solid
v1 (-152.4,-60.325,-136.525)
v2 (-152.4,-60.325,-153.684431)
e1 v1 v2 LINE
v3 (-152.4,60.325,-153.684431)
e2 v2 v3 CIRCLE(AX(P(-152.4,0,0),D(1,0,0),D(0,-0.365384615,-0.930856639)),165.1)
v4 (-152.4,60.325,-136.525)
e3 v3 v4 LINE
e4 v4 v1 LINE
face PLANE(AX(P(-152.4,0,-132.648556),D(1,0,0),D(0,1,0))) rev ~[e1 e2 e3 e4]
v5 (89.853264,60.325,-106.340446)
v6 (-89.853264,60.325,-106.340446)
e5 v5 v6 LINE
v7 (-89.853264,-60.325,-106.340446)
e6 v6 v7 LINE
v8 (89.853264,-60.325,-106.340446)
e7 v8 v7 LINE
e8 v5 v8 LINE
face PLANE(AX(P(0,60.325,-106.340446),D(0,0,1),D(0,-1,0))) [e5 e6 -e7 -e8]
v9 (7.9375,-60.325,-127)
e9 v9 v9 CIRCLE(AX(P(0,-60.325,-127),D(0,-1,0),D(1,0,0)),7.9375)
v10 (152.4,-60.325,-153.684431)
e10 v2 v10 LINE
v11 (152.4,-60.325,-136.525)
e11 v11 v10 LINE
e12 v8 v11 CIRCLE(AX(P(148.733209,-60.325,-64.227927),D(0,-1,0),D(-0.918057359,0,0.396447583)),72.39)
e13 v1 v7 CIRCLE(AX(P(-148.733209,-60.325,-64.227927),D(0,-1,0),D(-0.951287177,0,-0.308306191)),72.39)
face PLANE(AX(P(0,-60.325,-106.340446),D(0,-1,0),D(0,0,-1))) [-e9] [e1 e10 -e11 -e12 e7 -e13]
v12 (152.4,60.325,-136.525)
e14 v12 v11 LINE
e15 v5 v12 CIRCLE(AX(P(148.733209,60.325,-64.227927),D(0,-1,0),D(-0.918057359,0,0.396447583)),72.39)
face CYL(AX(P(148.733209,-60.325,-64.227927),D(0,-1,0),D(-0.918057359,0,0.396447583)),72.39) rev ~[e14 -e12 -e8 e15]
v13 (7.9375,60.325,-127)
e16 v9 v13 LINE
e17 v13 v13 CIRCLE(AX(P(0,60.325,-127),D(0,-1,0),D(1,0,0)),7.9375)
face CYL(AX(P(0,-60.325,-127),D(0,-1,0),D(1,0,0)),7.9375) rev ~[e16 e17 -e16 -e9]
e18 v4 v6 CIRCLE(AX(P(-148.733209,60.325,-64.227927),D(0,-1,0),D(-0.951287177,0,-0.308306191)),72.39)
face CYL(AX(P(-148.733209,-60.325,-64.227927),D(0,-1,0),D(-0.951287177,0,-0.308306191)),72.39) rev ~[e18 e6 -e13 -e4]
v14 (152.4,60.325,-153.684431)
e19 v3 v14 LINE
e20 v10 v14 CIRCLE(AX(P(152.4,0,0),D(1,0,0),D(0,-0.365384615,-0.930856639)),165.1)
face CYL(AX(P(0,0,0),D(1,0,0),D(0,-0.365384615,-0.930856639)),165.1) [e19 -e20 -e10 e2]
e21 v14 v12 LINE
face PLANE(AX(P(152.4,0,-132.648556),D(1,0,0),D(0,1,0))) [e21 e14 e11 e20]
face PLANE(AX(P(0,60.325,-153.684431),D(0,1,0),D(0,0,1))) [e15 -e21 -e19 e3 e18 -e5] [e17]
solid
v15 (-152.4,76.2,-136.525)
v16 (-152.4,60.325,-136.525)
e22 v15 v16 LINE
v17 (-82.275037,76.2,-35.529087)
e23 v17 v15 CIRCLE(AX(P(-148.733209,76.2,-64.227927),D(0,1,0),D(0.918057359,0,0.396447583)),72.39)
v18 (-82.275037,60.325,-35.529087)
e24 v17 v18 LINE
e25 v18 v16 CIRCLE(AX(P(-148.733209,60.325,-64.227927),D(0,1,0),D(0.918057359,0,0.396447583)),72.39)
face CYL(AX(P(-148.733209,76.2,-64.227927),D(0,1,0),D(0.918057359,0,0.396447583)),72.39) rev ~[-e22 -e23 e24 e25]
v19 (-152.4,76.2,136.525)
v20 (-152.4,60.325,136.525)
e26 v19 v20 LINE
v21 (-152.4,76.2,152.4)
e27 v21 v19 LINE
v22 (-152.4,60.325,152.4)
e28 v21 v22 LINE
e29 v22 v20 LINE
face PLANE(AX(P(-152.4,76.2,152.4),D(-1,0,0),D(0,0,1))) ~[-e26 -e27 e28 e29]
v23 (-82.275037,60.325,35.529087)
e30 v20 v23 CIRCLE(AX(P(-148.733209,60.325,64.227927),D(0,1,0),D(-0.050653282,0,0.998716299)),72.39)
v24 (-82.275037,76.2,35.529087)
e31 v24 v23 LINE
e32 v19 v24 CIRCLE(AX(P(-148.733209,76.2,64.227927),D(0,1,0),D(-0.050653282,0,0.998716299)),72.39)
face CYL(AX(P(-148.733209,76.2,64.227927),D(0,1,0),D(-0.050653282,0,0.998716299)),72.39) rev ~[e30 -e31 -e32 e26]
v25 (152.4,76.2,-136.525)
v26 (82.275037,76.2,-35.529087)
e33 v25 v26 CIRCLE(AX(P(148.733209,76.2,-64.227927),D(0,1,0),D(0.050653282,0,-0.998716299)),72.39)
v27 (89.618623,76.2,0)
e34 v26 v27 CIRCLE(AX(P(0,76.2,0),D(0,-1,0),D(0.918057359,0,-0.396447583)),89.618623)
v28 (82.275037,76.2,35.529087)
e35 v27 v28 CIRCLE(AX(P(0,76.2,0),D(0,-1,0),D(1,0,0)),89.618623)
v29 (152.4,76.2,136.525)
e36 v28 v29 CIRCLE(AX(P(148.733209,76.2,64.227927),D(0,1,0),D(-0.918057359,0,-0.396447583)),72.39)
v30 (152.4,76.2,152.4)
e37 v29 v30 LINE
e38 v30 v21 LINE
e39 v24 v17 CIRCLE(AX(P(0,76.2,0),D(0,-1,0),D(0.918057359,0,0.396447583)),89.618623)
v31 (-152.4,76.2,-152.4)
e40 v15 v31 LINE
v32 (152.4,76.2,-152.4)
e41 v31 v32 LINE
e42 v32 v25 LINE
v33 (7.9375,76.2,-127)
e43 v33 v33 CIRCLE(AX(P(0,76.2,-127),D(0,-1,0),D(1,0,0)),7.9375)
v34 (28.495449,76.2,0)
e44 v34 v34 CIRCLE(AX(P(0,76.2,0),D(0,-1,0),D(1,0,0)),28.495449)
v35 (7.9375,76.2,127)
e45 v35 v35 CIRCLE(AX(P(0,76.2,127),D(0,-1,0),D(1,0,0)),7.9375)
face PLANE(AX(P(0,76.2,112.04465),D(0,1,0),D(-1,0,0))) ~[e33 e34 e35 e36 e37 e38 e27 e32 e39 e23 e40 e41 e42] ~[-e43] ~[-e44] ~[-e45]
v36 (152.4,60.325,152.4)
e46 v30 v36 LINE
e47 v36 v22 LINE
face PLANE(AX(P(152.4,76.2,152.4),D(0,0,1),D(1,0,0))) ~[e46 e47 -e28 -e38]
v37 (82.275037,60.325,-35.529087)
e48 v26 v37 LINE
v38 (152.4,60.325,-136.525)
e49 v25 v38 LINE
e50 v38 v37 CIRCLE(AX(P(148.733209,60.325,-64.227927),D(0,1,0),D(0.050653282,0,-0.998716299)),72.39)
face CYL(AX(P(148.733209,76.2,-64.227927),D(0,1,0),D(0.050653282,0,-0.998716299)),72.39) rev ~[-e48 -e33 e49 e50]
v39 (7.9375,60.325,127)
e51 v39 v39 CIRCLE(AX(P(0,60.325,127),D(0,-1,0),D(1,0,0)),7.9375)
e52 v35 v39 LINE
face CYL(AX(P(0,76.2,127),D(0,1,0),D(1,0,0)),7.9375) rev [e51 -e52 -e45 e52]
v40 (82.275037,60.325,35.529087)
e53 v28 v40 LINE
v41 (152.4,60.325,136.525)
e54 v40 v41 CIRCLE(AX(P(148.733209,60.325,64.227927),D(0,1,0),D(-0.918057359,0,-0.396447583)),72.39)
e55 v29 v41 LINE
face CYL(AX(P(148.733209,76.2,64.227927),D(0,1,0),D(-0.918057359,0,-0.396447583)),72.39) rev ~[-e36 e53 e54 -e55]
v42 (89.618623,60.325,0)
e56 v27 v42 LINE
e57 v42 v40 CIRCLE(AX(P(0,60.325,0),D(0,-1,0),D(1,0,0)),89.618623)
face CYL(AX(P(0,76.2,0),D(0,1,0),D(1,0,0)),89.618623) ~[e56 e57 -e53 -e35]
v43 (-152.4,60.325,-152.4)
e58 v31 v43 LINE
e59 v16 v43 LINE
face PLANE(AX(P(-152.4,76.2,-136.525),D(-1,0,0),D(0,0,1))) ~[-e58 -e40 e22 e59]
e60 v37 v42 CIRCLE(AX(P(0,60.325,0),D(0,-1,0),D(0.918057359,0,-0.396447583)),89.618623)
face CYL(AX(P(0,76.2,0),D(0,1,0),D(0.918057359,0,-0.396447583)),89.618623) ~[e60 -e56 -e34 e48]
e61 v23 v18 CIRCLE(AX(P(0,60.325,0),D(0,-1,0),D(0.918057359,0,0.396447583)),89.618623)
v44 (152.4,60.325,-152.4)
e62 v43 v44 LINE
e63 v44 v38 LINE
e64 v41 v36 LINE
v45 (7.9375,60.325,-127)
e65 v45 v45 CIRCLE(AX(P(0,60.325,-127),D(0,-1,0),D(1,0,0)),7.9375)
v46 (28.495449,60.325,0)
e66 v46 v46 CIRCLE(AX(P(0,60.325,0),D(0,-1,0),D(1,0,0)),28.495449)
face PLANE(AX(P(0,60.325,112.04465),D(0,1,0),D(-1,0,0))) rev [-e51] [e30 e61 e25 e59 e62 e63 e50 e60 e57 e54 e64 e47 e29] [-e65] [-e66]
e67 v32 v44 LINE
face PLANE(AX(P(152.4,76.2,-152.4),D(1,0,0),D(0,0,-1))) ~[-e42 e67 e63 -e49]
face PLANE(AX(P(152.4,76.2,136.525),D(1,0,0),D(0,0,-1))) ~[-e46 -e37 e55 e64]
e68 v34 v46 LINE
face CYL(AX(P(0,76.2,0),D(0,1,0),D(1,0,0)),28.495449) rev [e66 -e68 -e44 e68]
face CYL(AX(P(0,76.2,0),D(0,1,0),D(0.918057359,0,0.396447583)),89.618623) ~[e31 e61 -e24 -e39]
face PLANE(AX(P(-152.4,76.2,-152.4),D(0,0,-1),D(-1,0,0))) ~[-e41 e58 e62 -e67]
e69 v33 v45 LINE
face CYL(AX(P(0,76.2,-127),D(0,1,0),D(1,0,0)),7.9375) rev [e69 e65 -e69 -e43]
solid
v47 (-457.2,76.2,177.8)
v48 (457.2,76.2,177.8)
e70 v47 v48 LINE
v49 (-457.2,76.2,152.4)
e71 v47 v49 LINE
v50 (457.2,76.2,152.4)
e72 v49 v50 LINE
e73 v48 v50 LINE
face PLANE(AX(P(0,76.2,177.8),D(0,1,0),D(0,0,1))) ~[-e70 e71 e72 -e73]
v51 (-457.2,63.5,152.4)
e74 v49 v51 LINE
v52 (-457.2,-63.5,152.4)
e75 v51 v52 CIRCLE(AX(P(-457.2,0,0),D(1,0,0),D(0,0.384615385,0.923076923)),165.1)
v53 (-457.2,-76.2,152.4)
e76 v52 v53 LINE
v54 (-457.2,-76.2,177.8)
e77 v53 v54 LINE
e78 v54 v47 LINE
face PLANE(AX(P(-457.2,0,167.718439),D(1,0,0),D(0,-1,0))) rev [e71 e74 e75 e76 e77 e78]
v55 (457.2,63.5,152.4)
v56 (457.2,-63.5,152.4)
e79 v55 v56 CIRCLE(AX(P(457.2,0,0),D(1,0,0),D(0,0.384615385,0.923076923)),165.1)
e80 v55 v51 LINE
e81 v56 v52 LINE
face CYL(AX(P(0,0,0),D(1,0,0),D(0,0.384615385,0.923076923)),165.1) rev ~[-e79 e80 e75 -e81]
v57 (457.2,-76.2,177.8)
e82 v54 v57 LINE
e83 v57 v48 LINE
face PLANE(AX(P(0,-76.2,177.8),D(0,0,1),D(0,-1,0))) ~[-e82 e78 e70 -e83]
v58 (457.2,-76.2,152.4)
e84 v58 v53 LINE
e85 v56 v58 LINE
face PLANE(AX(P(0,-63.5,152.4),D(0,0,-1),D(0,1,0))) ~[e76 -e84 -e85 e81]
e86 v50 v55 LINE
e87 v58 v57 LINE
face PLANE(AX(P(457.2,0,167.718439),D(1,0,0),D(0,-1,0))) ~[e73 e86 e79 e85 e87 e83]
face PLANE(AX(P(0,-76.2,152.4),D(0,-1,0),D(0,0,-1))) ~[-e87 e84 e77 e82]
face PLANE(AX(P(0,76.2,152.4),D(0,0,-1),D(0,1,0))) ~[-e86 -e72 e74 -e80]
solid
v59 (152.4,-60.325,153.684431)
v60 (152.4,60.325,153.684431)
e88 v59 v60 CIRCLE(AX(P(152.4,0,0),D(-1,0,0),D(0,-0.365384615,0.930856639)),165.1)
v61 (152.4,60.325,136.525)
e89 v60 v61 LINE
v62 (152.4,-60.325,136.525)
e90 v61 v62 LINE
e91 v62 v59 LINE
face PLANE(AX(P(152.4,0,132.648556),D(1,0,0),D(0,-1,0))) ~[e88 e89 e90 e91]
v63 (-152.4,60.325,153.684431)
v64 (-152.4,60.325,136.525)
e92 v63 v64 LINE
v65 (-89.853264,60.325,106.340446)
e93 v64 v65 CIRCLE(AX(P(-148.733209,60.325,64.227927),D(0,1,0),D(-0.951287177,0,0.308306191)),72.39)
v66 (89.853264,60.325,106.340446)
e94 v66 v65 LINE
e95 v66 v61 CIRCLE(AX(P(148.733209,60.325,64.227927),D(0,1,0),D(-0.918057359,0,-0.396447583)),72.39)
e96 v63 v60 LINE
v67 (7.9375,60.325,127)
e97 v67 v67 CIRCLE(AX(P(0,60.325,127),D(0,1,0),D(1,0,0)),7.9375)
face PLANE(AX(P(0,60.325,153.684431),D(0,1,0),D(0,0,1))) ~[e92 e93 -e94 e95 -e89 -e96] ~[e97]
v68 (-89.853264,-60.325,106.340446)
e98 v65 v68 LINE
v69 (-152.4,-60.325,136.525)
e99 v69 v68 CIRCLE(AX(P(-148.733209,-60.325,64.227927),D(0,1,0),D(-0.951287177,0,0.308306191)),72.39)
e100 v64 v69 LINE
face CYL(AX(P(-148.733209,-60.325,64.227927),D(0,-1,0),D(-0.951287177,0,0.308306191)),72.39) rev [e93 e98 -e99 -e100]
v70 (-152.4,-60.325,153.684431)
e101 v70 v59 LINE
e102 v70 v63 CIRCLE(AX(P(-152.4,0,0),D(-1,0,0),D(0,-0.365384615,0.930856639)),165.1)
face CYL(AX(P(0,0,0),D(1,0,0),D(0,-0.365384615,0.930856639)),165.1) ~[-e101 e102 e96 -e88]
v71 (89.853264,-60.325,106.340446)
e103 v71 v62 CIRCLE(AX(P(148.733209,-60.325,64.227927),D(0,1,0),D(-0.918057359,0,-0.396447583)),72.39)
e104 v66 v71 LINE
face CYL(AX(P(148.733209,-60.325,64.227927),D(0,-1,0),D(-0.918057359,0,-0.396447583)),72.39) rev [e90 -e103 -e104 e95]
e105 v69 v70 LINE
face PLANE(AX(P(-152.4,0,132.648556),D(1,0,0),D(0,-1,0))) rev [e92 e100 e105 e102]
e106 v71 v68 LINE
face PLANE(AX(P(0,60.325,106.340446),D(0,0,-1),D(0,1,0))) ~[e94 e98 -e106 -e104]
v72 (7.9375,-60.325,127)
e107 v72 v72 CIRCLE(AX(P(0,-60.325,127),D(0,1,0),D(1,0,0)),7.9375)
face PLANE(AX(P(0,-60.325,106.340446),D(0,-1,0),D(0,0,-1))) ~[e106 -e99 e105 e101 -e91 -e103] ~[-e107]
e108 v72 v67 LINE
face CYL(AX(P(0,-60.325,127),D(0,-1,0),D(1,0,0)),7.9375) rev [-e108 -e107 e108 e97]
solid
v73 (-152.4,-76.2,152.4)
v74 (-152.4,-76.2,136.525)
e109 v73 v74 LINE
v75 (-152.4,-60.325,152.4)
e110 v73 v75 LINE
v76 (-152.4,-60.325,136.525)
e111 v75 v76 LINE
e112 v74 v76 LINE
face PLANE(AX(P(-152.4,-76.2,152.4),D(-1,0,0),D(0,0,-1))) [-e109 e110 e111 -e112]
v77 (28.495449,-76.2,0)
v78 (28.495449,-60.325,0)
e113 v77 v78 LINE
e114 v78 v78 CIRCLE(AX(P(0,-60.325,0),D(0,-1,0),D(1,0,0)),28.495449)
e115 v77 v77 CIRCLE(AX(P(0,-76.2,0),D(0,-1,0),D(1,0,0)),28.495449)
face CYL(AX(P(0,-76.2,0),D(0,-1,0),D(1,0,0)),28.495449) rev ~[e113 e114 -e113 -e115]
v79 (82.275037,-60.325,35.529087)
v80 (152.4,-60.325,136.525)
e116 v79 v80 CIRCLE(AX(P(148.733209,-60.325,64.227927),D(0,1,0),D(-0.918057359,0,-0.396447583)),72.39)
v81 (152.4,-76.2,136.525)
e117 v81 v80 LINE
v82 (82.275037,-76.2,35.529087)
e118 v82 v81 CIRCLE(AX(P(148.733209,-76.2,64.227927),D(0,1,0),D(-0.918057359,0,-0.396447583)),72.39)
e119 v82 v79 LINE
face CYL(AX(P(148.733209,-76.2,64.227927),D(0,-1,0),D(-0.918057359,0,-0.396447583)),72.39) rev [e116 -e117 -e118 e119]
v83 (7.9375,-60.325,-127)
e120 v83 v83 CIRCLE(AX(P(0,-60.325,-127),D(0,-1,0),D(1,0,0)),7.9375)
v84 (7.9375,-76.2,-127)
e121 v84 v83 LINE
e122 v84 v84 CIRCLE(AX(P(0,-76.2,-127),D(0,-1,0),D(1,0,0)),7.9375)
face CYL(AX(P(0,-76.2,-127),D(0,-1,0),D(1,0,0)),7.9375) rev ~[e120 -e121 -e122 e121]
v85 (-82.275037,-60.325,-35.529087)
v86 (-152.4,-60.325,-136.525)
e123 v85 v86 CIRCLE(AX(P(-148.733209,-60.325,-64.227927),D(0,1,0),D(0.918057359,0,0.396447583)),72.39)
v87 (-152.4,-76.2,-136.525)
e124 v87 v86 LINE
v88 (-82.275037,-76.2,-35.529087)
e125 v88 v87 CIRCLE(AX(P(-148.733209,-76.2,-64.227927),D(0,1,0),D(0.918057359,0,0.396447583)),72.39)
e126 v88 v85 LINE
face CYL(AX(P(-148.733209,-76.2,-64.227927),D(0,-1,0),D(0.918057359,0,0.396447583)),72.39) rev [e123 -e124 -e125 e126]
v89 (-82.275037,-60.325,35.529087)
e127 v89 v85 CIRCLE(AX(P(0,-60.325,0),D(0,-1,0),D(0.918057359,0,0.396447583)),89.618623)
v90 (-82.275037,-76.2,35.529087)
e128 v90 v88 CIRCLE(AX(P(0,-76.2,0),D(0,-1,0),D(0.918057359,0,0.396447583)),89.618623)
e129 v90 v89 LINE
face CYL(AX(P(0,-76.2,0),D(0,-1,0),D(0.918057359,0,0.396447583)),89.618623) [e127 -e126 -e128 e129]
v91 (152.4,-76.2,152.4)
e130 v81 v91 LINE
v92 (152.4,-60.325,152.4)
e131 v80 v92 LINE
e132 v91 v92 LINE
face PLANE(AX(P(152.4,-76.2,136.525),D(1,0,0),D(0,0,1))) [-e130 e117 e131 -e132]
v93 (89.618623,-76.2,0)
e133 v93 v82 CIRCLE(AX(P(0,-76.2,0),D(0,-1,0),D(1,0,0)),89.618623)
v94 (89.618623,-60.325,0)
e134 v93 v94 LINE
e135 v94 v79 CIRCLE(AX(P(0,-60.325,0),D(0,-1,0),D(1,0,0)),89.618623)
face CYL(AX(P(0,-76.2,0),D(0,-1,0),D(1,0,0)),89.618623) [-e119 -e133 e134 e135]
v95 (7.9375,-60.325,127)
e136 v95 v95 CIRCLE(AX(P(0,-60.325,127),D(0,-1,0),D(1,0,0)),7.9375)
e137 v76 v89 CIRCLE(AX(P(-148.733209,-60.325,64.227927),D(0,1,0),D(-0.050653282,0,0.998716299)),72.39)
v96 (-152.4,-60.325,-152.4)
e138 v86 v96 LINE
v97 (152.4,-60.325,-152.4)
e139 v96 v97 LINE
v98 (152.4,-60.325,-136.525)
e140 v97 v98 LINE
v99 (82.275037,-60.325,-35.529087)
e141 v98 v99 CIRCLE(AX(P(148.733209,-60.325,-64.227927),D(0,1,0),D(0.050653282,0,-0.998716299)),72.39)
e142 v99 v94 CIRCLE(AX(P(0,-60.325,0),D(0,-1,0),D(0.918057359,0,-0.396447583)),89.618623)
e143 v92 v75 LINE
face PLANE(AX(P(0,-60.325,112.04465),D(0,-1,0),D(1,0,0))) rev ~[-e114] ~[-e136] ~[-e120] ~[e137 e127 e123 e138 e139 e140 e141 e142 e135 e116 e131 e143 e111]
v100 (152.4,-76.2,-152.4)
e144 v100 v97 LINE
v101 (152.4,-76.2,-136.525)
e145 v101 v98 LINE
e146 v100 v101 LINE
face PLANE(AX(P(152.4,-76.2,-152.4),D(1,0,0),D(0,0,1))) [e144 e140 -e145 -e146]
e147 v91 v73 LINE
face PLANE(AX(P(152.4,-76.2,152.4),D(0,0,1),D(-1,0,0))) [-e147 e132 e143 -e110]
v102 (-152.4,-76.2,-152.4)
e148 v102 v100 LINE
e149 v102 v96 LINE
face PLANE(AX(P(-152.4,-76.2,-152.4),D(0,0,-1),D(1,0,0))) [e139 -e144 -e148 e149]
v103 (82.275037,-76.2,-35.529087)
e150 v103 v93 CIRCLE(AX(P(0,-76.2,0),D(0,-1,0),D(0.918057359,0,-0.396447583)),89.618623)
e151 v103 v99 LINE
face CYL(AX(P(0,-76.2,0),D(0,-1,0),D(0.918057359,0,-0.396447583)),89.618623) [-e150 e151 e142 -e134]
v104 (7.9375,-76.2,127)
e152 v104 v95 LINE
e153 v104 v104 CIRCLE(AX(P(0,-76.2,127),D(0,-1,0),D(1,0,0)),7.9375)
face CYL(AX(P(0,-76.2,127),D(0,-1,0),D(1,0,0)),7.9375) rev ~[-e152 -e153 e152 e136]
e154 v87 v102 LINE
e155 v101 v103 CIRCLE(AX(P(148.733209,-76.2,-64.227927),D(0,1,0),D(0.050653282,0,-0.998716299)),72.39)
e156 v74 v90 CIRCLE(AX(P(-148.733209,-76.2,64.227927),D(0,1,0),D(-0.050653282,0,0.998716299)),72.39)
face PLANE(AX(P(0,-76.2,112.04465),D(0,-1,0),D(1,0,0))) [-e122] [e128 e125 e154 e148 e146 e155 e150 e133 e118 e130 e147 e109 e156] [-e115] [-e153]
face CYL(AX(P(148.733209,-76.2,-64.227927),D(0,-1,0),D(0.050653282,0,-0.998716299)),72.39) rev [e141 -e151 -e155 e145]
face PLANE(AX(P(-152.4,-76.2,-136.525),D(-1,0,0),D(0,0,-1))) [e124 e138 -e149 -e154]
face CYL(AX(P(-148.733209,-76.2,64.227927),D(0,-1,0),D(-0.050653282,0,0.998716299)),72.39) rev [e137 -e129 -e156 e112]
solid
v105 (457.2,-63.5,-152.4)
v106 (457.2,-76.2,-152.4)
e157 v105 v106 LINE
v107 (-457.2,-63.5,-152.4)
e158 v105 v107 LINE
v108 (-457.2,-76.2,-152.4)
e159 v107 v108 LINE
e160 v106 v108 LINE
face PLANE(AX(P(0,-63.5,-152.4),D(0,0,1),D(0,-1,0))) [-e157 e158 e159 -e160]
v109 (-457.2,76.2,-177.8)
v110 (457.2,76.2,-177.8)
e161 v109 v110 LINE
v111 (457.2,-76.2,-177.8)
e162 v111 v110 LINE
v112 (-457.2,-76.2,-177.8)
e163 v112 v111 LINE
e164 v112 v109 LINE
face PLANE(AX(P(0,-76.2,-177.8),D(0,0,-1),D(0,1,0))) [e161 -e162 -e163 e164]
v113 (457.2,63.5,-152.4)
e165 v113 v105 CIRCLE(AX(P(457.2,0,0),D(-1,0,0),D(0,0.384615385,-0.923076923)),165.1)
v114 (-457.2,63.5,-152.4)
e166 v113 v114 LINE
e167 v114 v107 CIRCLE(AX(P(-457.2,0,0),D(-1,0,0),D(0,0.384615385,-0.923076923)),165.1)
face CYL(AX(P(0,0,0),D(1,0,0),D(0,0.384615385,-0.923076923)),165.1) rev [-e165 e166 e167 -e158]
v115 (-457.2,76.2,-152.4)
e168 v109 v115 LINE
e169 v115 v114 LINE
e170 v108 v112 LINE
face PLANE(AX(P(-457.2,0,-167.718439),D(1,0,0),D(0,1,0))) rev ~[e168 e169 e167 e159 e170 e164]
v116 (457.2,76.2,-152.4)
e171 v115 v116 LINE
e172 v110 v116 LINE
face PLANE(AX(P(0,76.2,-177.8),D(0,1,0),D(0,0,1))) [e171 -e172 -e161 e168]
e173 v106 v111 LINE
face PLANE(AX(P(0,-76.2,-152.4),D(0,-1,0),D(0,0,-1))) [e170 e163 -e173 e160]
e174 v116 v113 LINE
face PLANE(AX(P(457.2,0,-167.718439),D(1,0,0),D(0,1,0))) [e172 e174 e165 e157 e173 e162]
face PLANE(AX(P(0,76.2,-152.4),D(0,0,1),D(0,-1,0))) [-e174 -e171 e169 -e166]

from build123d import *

# Parameters (mm, degrees)
F3_DEPTH  = 457.2
F5_R      = 7.9375
F5_R_2    = 28.4954486751
F6_DEPTH  = 15.875
F8_DEPTH  = 152.4
F9_R      = 7.9375
F10_DEPTH = 136.526


# Not quite as in the source:
# - a variable given as a bare number and used for a length is read in inches; the dataset says mm whatever the document's units were


with BuildPart() as f3:
    # F2 (on Right) → F3 (new body, symmetric)
    with BuildSketch(Plane.YZ):
        with BuildLine():
            Line((-76.2, -152.4), (-76.2, -177.8))
            Line((-76.2, -177.8), (76.2, -177.8))
            Line((76.2, -177.8), (76.2, -152.4))
            Line((76.2, -152.4), (63.5, -152.4))
            ThreePointArc((63.5, -152.4), (0, -165.1), (-63.5, -152.4))
            Line((-63.5, -152.4), (-76.2, -152.4))
        make_face()
    extrude(amount=F3_DEPTH, both=True)


with BuildPart() as f6:
    # F5 (on offset) → F6 (new body)
    with BuildSketch(Plane.XZ.offset(76.2)):
        with BuildLine():
            ThreePointArc((-82.2750366967, 35.5290866249), (0, 89.6186233985), (82.2750366967, 35.5290866249))
            ThreePointArc((82.2750366967, 35.5290866249), (89.271178874, 105.5144756245), (152.4, 136.525))
            Line((152.4, 136.525), (152.4, 152.4))
            Line((152.4, 152.4), (0, 152.4))
            Line((0, 152.4), (-152.4, 152.4))
            Line((-152.4, 152.4), (-152.4, 136.525))
            ThreePointArc((-152.4, 136.525), (-89.271178874, 105.5144756245), (-82.2750366967, 35.5290866249))
        make_face()
        with Locations((0, 127)):
            Circle(F5_R, mode=Mode.SUBTRACT)
        with BuildLine():
            ThreePointArc((82.2750366967, -35.5290866249), (87.7635265605, -18.1400403944), (89.6186233985, 0))
            ThreePointArc((89.6186233985, 0), (87.7635265605, 18.1400403944), (82.2750366967, 35.5290866249))
            ThreePointArc((82.2750366967, 35.5290866249), (0, 89.6186233985), (-82.2750366967, 35.5290866249))
            ThreePointArc((-82.2750366967, 35.5290866249), (-89.6186233985, 0), (-82.2750366967, -35.5290866249))
            ThreePointArc((-82.2750366967, -35.5290866249), (0, -89.6186233985), (82.2750366967, -35.5290866249))
        make_face()
        Circle(F5_R_2, mode=Mode.SUBTRACT)
        with BuildLine():
            ThreePointArc((152.4, -136.525), (89.271178874, -105.5144756245), (82.2750366967, -35.5290866249))
            ThreePointArc((82.2750366967, -35.5290866249), (0, -89.6186233985), (-82.2750366967, -35.5290866249))
            ThreePointArc((-82.2750366967, -35.5290866249), (-89.271178874, -105.5144756245), (-152.4, -136.525))
            Line((-152.4, -136.525), (-152.4, -152.4))
            Line((-152.4, -152.4), (0, -152.4))
            Line((0, -152.4), (152.4, -152.4))
            Line((152.4, -152.4), (152.4, -136.525))
        make_face()
        with Locations((0, -127)):
            Circle(F5_R, mode=Mode.SUBTRACT)
    extrude(amount=-F6_DEPTH)


with BuildPart() as f8:
    # F7 (on Right) → F8 (new body, symmetric)
    with BuildSketch(Plane.YZ):
        with BuildLine():
            Line((-60.325, -106.3404455781), (-60.325, -153.6844311406))
            ThreePointArc((-60.325, -153.6844311406), (0, -165.1), (60.325, -153.6844311406))
            Line((60.325, -153.6844311406), (60.325, -106.3404455781))
            Line((60.325, -106.3404455781), (-60.325, -106.3404455781))
        make_face()
    extrude(amount=F8_DEPTH, both=True)

    # F9 (on face) → F10 (cut, through all)
    with BuildSketch(Plane.XZ.offset(60.325)):
        with BuildLine():
            Line((217.5968876211, -86.5462123202), (82.2750366967, -35.5290866249))
            ThreePointArc((82.2750366967, -35.5290866249), (123.1963063092, -131.9640231824), (217.5968876211, -86.5462123202))
        make_face()
        with Locations((0, -127)):
            Circle(F9_R)
        with BuildLine():
            ThreePointArc((-217.5968876211, -86.5462123202), (-123.1963063092, -131.9640231824), (-82.2750366967, -35.5290866249))
            Line((-82.2750366967, -35.5290866249), (-217.5968876211, -86.5462123202))
        make_face()
    extrude(amount=-F10_DEPTH, mode=Mode.SUBTRACT)


with BuildPart() as f11_1:
    # F11: instance of F3
    add(f3.part.mirror(Plane.XY))


with BuildPart() as f11_2:
    # F11: instance of F8
    add(f8.part.mirror(Plane.XY))


with BuildPart() as f12_1:
    # F12: instance of F6
    add(f6.part.mirror(Plane.XZ))


solid = Compound([f3.part, f6.part, f8.part, f11_1.part, f11_2.part, f12_1.part])
